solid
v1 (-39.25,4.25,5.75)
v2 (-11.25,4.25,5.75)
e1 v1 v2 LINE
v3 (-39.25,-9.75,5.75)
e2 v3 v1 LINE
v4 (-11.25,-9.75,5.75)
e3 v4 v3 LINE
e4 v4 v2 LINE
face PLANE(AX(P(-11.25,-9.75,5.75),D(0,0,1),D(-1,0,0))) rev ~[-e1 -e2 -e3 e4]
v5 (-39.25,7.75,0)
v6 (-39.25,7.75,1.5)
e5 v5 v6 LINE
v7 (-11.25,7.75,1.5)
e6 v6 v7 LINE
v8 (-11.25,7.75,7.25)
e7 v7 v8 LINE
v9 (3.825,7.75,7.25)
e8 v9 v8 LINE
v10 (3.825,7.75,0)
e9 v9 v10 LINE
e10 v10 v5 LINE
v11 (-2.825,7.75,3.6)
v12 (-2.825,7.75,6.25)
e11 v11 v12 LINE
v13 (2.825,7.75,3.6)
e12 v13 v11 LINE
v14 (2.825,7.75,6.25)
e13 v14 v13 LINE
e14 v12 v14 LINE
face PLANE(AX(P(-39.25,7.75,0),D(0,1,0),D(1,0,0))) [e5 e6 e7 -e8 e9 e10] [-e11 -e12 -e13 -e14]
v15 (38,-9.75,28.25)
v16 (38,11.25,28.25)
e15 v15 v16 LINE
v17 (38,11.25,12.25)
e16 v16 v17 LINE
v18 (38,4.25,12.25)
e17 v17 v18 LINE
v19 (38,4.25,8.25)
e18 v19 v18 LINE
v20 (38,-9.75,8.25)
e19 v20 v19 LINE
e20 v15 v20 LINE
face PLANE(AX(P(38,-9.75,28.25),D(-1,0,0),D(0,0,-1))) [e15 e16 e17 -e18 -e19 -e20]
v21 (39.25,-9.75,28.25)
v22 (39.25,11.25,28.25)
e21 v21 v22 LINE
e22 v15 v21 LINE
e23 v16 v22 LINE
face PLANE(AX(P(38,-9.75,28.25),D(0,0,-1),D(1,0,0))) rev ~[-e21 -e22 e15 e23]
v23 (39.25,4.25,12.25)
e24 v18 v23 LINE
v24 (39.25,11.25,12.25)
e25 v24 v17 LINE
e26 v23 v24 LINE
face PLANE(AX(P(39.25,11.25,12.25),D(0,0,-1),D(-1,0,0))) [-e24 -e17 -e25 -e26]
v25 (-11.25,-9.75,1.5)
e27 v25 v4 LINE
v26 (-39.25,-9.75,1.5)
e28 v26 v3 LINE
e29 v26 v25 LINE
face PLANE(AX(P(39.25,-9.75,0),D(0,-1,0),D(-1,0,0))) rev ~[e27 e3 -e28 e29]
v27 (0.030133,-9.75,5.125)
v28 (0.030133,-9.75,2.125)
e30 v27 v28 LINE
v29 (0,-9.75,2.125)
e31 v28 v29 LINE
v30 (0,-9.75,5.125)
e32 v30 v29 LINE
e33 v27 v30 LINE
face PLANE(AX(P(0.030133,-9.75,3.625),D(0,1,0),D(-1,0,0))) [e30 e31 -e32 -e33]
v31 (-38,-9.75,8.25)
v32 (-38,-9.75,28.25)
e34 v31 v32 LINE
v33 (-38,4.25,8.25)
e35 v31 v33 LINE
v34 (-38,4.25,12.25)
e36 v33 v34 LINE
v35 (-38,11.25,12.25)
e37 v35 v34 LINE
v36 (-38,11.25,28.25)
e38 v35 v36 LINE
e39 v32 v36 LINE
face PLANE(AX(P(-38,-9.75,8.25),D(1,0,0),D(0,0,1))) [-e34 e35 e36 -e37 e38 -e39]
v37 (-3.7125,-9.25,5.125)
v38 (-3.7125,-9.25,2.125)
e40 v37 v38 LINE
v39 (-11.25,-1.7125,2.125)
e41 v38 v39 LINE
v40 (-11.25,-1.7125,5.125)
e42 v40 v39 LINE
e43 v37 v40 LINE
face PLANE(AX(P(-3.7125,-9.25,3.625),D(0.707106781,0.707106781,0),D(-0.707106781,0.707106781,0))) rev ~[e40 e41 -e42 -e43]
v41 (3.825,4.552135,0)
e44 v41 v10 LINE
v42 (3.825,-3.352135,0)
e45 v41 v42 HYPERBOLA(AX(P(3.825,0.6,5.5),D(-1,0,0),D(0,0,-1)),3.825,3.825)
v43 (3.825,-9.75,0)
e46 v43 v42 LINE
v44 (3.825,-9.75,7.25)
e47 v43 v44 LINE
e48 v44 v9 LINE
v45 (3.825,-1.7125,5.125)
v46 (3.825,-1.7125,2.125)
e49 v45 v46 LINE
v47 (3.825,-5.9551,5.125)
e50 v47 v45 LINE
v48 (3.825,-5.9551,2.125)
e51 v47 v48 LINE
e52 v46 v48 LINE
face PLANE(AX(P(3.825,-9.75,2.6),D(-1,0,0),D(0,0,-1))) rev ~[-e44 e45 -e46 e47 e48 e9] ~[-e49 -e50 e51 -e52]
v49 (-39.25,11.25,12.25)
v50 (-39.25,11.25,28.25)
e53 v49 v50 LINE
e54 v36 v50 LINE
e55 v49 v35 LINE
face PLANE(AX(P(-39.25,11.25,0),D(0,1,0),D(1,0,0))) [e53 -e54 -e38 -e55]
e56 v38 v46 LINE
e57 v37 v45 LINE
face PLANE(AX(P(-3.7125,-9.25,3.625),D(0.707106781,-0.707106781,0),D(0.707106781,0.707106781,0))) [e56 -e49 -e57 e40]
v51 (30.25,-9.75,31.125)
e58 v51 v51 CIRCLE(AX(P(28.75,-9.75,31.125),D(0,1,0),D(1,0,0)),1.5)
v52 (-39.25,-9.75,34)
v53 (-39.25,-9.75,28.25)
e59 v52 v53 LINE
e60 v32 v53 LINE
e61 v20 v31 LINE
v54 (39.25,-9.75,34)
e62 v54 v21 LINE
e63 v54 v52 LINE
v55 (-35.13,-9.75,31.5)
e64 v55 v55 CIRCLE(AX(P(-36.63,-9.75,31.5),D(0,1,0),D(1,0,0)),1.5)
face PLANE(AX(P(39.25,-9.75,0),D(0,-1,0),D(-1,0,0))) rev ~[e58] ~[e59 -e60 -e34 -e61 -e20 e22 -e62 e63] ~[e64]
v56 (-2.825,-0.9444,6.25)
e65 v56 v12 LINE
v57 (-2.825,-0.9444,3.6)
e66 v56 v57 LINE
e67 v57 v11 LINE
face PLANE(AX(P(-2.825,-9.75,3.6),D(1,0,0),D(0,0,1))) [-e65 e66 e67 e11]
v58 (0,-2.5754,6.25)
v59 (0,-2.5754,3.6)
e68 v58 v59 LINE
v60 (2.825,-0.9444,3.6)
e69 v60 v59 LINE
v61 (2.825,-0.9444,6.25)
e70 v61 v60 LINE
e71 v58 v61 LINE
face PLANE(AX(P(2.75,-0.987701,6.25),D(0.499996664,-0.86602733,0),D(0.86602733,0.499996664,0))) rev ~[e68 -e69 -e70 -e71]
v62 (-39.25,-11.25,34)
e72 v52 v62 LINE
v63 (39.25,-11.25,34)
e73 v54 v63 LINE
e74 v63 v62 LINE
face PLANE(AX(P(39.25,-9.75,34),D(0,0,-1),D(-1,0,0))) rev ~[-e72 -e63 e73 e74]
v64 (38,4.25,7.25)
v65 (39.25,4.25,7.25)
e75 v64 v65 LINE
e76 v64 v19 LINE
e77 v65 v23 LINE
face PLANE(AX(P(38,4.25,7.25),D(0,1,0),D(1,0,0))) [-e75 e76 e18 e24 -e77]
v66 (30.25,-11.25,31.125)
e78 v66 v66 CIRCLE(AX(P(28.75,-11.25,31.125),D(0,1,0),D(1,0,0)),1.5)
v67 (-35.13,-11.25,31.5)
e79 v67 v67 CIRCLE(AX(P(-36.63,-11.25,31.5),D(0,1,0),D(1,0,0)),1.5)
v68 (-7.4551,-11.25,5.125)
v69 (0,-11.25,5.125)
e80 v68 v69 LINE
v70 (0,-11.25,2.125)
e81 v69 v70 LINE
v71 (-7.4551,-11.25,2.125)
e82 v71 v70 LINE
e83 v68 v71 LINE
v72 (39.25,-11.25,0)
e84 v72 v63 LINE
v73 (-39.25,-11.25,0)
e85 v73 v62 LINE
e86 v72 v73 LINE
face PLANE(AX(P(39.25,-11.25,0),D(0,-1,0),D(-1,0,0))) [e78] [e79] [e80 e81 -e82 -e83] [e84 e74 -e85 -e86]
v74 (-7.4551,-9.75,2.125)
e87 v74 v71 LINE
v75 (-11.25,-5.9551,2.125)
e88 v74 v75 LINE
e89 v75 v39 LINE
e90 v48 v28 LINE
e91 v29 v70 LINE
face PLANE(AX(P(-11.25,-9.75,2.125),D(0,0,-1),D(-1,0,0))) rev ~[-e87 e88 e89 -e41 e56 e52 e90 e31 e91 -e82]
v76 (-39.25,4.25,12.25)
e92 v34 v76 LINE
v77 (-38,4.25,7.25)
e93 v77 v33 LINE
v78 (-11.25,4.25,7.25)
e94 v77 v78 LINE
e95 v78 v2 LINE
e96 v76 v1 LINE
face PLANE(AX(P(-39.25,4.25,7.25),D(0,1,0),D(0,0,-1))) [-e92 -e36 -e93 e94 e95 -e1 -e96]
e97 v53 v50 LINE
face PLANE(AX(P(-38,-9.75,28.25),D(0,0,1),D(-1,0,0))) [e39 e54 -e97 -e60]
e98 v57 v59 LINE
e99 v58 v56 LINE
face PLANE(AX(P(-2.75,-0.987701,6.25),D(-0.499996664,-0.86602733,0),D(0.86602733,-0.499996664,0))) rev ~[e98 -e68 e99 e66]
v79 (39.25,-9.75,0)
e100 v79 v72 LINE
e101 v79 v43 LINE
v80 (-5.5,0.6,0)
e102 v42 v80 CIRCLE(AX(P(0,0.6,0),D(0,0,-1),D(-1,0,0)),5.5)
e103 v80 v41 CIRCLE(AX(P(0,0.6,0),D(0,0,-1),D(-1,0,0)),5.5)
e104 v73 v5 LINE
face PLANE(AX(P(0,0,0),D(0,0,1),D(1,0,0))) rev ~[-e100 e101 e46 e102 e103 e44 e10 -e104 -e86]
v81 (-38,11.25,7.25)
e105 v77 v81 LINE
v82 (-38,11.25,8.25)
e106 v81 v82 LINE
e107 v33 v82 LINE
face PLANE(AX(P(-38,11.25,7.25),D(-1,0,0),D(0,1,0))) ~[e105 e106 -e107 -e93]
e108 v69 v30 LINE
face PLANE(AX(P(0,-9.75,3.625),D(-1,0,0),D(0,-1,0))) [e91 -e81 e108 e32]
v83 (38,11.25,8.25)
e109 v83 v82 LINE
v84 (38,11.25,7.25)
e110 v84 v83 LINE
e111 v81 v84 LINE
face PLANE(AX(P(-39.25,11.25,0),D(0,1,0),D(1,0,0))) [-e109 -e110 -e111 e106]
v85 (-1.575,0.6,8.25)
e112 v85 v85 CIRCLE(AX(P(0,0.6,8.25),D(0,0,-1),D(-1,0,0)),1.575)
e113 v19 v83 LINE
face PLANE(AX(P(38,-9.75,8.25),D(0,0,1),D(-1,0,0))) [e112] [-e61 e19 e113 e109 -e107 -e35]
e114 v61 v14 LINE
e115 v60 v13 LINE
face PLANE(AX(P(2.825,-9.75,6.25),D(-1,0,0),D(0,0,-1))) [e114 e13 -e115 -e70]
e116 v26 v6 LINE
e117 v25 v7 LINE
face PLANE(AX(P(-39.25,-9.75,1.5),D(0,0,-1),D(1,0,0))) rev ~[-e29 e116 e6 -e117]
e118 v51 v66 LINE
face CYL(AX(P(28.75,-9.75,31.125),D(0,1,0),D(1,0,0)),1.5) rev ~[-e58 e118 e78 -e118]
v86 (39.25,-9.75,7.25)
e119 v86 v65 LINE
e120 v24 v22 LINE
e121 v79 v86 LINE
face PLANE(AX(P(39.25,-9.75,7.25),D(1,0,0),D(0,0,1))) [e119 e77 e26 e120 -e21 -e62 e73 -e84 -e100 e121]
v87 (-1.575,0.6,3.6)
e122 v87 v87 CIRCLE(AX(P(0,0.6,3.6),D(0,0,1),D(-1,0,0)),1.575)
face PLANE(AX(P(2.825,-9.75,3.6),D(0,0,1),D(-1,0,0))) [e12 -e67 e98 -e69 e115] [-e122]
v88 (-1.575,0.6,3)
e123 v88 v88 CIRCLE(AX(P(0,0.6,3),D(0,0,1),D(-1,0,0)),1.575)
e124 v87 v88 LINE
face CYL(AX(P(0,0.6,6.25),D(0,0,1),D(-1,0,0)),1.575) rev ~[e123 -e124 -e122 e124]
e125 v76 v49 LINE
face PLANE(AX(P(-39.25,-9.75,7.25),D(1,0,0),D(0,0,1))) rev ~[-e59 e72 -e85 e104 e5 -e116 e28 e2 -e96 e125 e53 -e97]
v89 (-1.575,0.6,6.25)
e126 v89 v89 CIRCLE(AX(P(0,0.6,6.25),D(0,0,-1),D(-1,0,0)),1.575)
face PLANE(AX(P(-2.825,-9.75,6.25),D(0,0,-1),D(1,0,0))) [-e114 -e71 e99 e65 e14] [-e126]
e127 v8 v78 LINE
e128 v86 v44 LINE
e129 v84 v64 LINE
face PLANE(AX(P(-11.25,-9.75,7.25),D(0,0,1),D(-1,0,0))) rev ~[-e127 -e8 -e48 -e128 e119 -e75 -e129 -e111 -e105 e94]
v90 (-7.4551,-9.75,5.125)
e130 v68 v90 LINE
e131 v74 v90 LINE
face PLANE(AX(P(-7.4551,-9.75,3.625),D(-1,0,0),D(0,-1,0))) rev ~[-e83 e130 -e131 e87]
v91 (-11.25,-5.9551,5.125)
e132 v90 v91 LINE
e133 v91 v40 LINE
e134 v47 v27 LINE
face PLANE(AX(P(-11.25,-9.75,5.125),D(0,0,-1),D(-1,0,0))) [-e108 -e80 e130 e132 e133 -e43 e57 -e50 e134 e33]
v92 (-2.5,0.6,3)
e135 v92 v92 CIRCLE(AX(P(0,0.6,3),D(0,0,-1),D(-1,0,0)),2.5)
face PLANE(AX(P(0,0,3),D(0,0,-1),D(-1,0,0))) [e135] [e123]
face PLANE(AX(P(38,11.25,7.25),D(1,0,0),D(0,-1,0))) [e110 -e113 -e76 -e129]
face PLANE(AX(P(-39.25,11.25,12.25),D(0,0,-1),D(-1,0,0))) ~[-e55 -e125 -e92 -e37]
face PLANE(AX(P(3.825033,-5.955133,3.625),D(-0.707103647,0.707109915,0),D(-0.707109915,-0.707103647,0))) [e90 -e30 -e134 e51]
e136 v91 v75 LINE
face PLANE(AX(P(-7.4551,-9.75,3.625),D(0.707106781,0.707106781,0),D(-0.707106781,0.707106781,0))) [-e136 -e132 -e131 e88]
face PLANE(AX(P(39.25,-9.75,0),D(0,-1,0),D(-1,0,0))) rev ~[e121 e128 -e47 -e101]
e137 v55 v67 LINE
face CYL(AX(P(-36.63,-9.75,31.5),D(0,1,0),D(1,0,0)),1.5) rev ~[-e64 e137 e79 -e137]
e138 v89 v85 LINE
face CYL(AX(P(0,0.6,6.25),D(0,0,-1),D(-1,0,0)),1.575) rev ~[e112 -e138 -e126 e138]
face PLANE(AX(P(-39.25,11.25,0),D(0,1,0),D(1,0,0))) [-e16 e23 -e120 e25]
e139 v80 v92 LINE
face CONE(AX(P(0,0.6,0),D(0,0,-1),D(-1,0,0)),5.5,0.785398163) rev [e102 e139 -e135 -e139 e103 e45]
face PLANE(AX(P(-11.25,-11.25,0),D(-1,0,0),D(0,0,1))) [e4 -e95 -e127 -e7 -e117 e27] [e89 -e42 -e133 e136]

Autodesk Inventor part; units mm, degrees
ref_plane "YZ Plane" through (0, 0, 0) normal (1, 0, 0) x (0, 1, 0)
ref_plane "XZ Plane" through (0, 0, 0) normal (0, 1, 0) x (-1, 0, 0)
sketch "Sketch1" plane through (0, 0, 0) normal (0, 0, 1) x (1, 0, 0)
  line L0 (-39.25, 11.25) -> (39.25, 11.25)
  line L1 (39.25, 11.25) -> (39.25, -11.25)
  line L2 (39.25, -11.25) -> (-39.25, -11.25)
  line L3 (-39.25, -11.25) -> (-39.25, 11.25)
  line L4 (-39.25, -11.25) -> (39.25, -11.25)
  line L5 (39.25, -11.25) -> (39.25, -9.75)
  line L6 (39.25, -9.75) -> (-39.25, -9.75)
  line L7 (-39.25, -9.75) -> (-39.25, -11.25)
  point P0 (0, 0)
  point P1 (0, 11.25)
  point P2 (39.25, 0)
  point P3 (-39.25, -9.75)
  dimension "d0" = 22.5
  dimension "d1" = 78.5
  dimension "d2" = 1.5
extrude "Extrusion1" add sketch "Sketch1" along normal blind 33 contours L6 L1 L2 L3
sketch "Sketch2" plane through (-39.25, -9.75, 0) normal (0, 1, 0) x (1, 0, 0)
  line L0 (0, -1.5) -> (28, -1.5)
  line L1 (28, -1.5) -> (28, -5.75)
  line L2 (28, -5.75) -> (0, -5.75)
  line L3 (0, -5.75) -> (0, -1.5)
  line L4 (0, 0) -> (0, -33) projected
  line L5 (78.5, 0) -> (0, 0) projected
  line L6 (0, -5.75) -> (29.5, -5.75)
  line L7 (29.5, -5.75) -> (29.5, -7.25)
  line L8 (29.5, -7.25) -> (0, -7.25)
  line L9 (0, -7.25) -> (0, -5.75)
  line L10 (0, 0) -> (78.5, 0) projected
  line L11 (29.5, -7.25) -> (28, -7.25)
  line L12 (28, -7.25) -> (28, 0)
  line L13 (28, 0) -> (29.5, 0)
  line L14 (29.5, 0) -> (29.5, -7.25)
  line L15 (0, -33) -> (78.5, -33) projected
  line L16 (1.25, -33) -> (77.25, -33)
  line L17 (77.25, -28.25) -> (77.25, -8.25)
  line L18 (77.25, -8.25) -> (1.25, -8.25)
  line L19 (1.25, -8.25) -> (1.25, -28.25)
  line L20 (0, 0) -> (0, -33) projected
  line L21 (0, -7.25) -> (78.5, -7.25)
  line L22 (78.5, 0) -> (78.5, -33) projected
  line L23 (43.075, -2.6) -> (35.425, -2.6)
  line L24 (35.425, -2.6) -> (35.425, -7.25)
  line L25 (35.425, -7.25) -> (43.075, -7.25)
  line L26 (43.075, -7.25) -> (43.075, -2.6)
  line L27 (42.075, -3.6) -> (36.425, -3.6)
  line L28 (36.425, -3.6) -> (36.425, -6.25)
  line L29 (36.425, -6.25) -> (42.075, -6.25)
  line L30 (42.075, -6.25) -> (42.075, -3.6)
  line L31 (29.5, -7.25) -> (35.425, -7.25)
  line L32 (43.075, -2.6) -> (43.075, 0)
  line L33 (77.25, -28.25) -> (1.25, -28.25)
  line L34 (77.25, -28.25) -> (78.5, -28.25)
  line L35 (1.25, -28.25) -> (0, -28.25)
  line L36 (0, -33) -> (78.5, -33)
  line L37 (78.5, -33) -> (78.5, -34)
  line L38 (78.5, -34) -> (0, -34)
  line L39 (0, -34) -> (0, -33)
  point P0 (39.25, 0)
  point P1 (39.25, -8.25)
  point P2 (39.25, 0)
  point P3 (39.25, -7.25)
  point P4 (39.25, -6.25)
  point P5 (42.075, -4.925)
  point P6 (43.075, -4.925)
  point P7 (0, -1.5)
  point P8 (0, -5.75)
  point P9 (0, -7.25)
  point P10 (0, -7.25)
  dimension "d5" = 28
  dimension "d6" = 4.25
  dimension "d7" = 1.5
  dimension "d8" = 1.5
  dimension "d9" = 1.5
  dimension "d10" = 20
  dimension "d11" = 76
  dimension "d12" = 1
  dimension "d13" = 4.65
  dimension "d14" = 7.65
  dimension "d16" = 2.65
  dimension "d17" = 5.65
  dimension "d52" = 1
extrude "Extrusion2" add sketch "Sketch2" along normal blind 17.5 contours L4 L5 L12 L0 | L12 L5 L14 L6 L1 | L2 L12 L8 L4 | L6 L7 L8 L12
extrude "Extrusion3" add sketch "Sketch2" along normal blind 21 contours L8 L21 L22 L34 L17 L18 L19 L35 L4
extrude "Extrusion4" add sketch "Sketch2" along normal blind 17.5 contours L14 L5 L32 L23 L24 L21 L7 | L24 L23 L26 L21
sketch "Sketch3" plane through (-38, -9.75, 8.25) normal (0, 0, 1) x (1, 0, 0)
  line L0 (75.85, 20.7) -> (0.15, 20.7)
  line L1 (0.15, 20.7) -> (0.15, 0)
  line L2 (0.15, 0) -> (75.85, 0)
  line L3 (75.85, 0) -> (75.85, 20.7)
  line L4 (76, 0) -> (0, 0) projected
  circle A0 centre (38, 10.35) radius 1.575
  line L5 (76, 0) -> (0, 0) projected
  point P0 (38, 9.75)
  point P1 (38, 20.7)
  point P2 (75.85, 10.35)
  dimension "d24" = 75.7
  dimension "d25" = 20.7
  dimension "d28" = 3.15
extrude "Extrusion5" [suppressed]
sketch "Sketch4" plane through (2.825, -9.75, 6.25) normal (0, 0, -1) x (-1, 0, 0)
  line L0 (5.65, 0) -> (0, 0) projected
  line L1 (5.65, 0) -> (5.65, 17.5) projected
  line L2 (0, 17.5) -> (5.65, 17.5) projected
  line L3 (0, 0) -> (0, 17.5) projected
  line L4 (2.825, 7.1746) -> (0, 8.8056)
  line L5 (0.075, 8.7623) -> (0.075, 11.9377)
  line L6 (0.075, 11.9377) -> (2.825, 13.5254)
  line L7 (2.825, 13.5254) -> (5.575, 11.9377)
  line L8 (5.575, 11.9377) -> (5.575, 8.7623)
  line L9 (5.65, 8.8056) -> (2.825, 7.1746)
  circle A0 centre (2.825, 10.35) radius 1.575
  point P0 (2.825, 9.75)
  point P1 (5.575, 10.35)
  point P2 (2.825, 0)
  dimension "d31" = 5.5
  dimension "d34" = 3.15
  dimension "d37" = 10.35
extrude "Extrusion6" add sketch "Sketch4" along normal up to surface (2.65 mm away) contours L0 L3 L4 L9 L1
extrude "Extrusion7" cut sketch "Sketch4" along normal mid plane 10 contours A0
fillet "Fillet1" [suppressed]
sketch "Sketch6" plane through (0, 0, 0) normal (0, 0, -1) x (-1, 0, 0)
  circle A0 centre (0, 0.6) radius 2.5
  line L0 (39.25, -11.25) -> (-39.25, -11.25) projected
  line L1 (39.25, 7.75) -> (39.25, -11.25) projected
  point P0 (0, 0)
  dimension "d43" = 5
  dimension "d44" = 11.85
  dimension "d45" = 39.25
extrude "Extrusion8" cut sketch "Sketch6" against normal blind 3
chamfer "Chamfer1" distance 3 angle 45 1 edges at (2.5, 0.6, 0)
extrude "Extrusion9" add sketch "Sketch2" against normal up to surface (1.5 mm away) contours L15 L37 L38 L39
sketch "Sketch7" plane through (-11.25, -9.75, 1.5) normal (-1, 0, 0) x (0, 0, 1)
  line L0 (0.625, 9) -> (3.625, 9)
  line L1 (3.625, 9) -> (3.625, 4)
  line L2 (3.625, 4) -> (0.625, 4)
  line L3 (0.625, 4) -> (0.625, 9)
  line L4 (4.25, 0) -> (0, 0) projected
  line L5 (0, 0) -> (4.25, 0) projected
  point P0 (-1.5, 9.75)
  point P1 (2.125, 4)
  point P2 (2.125, 0)
  dimension "d55" = 4
  dimension "d56" = 3
  dimension "d57" = 5
sketch "Sketch8" plane through (-39.25, -11.25, 0) normal (0, -1, 0) x (1, 0, 0)
  line L0 (41.75, 2) -> (36.75, 2)
  line L1 (36.75, 2) -> (36.75, 5)
  line L2 (36.75, 5) -> (41.75, 5)
  line L3 (41.75, 5) -> (41.75, 2)
  line L4 (0, 0) -> (78.5, 0) projected
  point P0 (39.25, 0)
  point P1 (39.25, 2)
  point P2 (39.25, 0)
  dimension "d58" = 5
  dimension "d59" = 3
  dimension "d60" = 2
loft "Loft1" [suppressed]
sketch "Sketch9" plane through (39.25, 11.25, 7.25) normal (0, 0, -1) x (-1, 0, 0)
  line L0 (0, -21) -> (0, 0) projected
  line L1 (0, 0) -> (1.25, 0)
  line L2 (1.25, 0) -> (1.25, -7)
  line L3 (1.25, -7) -> (0, -7)
  line L4 (0, -7) -> (0, 0)
  line L5 (0, 0) -> (78.5, 0) projected
  point P0 (39.25, -11.25)
  point P1 (0, -7)
  dimension "d65" = 7
extrude "Extrusion10" cut sketch "Sketch9" against normal blind 5
mirror "Mirror1" about plane through (0, 0, 0) normal (1, 0, 0) of "Extrusion10"
sketch "Sketch10" plane through (-39.25, -11.25, 0) normal (-1, 0, 0) x (0, 0, 1)
  line L0 (12.25, 15.5) -> (7.25, 15.5) projected
  line L1 (1.5, 19) -> (5.75, 19) projected
  line L2 (5.75, 19) -> (7.25, 19)
  line L3 (7.25, 19) -> (7.25, 15.5)
  line L4 (7.25, 15.5) -> (5.75, 15.5)
  line L5 (5.75, 15.5) -> (5.75, 19)
  point P0 (0, 11.25)
extrude "Extrusion11" cut sketch "Sketch10" against normal up to surface (28 mm away)
ref_plane "Work Plane1" through (-11.25, -9.75, 3.625) normal (0, 0, -1) x (-1, 0, 0)
sketch "Sketch11" plane through (-11.25, -9.75, 3.625) normal (0, 0, -1) x (-1, 0, 0)
  line L0 (0, 0) -> (0, 14) projected
  line L1 (0, 17.5) -> (0, 14) projected
  line L2 (0, 0) -> (0, 17.5) projected
  line L3 (-15.075, 0) -> (-15.075, 6.3979) projected
  line L4 (-15.075, 6.3979) -> (-9.6656, 6.3979) construction
  line L5 (-7.5375, 0.5) -> (-16.6978, 9.6603)
  line L6 (-7.5375, 0.5) -> (5.4171, 0.5) construction
  line L7 (-15.075, 17.5) -> (0, 17.5) projected
  line L8 (-7.5375, 0.5) -> (0, 8.0375)
  line L9 (0, 0) -> (0, 14) projected
  line L10 (-7.5375, 0.5) -> (3.1221, 0.5) construction
  line L11 (-18.8191, 7.5389) -> (-7.5375, -3.7426)
  line L12 (-7.5375, -3.7426) -> (2.1213, 5.9162)
  line L13 (-49.25, 0) -> (26.75, 0) projected
  line L14 (0, 3.7949) -> (0, 8.0375)
  line L15 (-15.075, 3.7949) -> (-15.075, 8.0375)
  line L16 (-11.25, 0) -> (-11.25, -1.5)
  line L17 (-3.7949, 0) -> (-3.7949, -1.5)
  line L18 (-11.25, -1.5) -> (-3.7949, -1.5)
  line L19 (-11.25, -1.5) -> (-3.7949, -1.5)
  line L20 (-3.7949, -1.5) -> (-3.7949, -2.3604)
  line L21 (-3.7949, -2.3604) -> (-11.25, -2.3604)
  line L22 (-11.25, -2.3604) -> (-11.25, -1.5)
  line L23 (28, -1.5) -> (-50.5, -1.5) projected
  point P0 (-11.25, 9.75)
  point P1 (-7.5375, 17.5)
  point P2 (0, 3.7949)
  point P3 (0, 8.0375)
  point P4 (-11.2801, 0)
  dimension "d73" = 135
  dimension "d74" = 45
  dimension "d75" = 3
  dimension "d76" = 0.5
extrude "Extrusion12" cut sketch "Sketch11" along normal mid plane 3 contours L12 L13 L11 L3 L15 L5 L8 L0 | L17 L18 L12 | L12 L18 L11 L16 L13 | L18 L20 L21 L12 | L12 L21 L11 L18 | L18 L16 L11 | L11 L21 L22 L18
sketch "Sketch12" plane through (-38, -9.75, 8.25) normal (0, 1, 0) x (1, 0, 0)
  circle A0 centre (1.37, -23.25) radius 1.5
  line L0 (-1.25, -25.75) -> (77.25, -25.75) projected
  line L1 (-1.25, -20) -> (-1.25, -25.75) projected
  circle A1 centre (66.75, -22.875) radius 1.5
  line L2 (77.25, -20) -> (77.25, -25.75) projected
  point P0 (38, 8.25)
  dimension "d79" = 3
  dimension "d80" = 2.5
  dimension "d81" = 2.62
  dimension "d82" = 3
  dimension "d83" = 2.875
  dimension "d84" = 10.5
extrude "Extrusion13" cut sketch "Sketch12" against normal up to surface (1.5 mm away)
sketch "Sketch13" plane through (-38, -9.75, 8.25) normal (0, 1, 0) x (1, 0, 0)
  circle A0 centre (1.37, -23.25) radius 1.5 projected
  circle A1 centre (66.75, -22.875) radius 1.5 projected
  line L0 (77.25, -20) -> (76, -20) projected
  line L1 (76, -20) -> (76, 0) projected
  line L2 (76, 0) -> (0, 0) projected
  line L3 (0, 0) -> (0, -20) projected
  line L4 (0, -20) -> (-1.25, -20) projected
  line L5 (-1.25, -20) -> (-1.25, -25.75) projected
  line L6 (-1.25, -25.75) -> (77.25, -25.75) projected
  line L7 (77.25, -20) -> (77.25, -25.75) projected
  point P0 (38, 8.25)
